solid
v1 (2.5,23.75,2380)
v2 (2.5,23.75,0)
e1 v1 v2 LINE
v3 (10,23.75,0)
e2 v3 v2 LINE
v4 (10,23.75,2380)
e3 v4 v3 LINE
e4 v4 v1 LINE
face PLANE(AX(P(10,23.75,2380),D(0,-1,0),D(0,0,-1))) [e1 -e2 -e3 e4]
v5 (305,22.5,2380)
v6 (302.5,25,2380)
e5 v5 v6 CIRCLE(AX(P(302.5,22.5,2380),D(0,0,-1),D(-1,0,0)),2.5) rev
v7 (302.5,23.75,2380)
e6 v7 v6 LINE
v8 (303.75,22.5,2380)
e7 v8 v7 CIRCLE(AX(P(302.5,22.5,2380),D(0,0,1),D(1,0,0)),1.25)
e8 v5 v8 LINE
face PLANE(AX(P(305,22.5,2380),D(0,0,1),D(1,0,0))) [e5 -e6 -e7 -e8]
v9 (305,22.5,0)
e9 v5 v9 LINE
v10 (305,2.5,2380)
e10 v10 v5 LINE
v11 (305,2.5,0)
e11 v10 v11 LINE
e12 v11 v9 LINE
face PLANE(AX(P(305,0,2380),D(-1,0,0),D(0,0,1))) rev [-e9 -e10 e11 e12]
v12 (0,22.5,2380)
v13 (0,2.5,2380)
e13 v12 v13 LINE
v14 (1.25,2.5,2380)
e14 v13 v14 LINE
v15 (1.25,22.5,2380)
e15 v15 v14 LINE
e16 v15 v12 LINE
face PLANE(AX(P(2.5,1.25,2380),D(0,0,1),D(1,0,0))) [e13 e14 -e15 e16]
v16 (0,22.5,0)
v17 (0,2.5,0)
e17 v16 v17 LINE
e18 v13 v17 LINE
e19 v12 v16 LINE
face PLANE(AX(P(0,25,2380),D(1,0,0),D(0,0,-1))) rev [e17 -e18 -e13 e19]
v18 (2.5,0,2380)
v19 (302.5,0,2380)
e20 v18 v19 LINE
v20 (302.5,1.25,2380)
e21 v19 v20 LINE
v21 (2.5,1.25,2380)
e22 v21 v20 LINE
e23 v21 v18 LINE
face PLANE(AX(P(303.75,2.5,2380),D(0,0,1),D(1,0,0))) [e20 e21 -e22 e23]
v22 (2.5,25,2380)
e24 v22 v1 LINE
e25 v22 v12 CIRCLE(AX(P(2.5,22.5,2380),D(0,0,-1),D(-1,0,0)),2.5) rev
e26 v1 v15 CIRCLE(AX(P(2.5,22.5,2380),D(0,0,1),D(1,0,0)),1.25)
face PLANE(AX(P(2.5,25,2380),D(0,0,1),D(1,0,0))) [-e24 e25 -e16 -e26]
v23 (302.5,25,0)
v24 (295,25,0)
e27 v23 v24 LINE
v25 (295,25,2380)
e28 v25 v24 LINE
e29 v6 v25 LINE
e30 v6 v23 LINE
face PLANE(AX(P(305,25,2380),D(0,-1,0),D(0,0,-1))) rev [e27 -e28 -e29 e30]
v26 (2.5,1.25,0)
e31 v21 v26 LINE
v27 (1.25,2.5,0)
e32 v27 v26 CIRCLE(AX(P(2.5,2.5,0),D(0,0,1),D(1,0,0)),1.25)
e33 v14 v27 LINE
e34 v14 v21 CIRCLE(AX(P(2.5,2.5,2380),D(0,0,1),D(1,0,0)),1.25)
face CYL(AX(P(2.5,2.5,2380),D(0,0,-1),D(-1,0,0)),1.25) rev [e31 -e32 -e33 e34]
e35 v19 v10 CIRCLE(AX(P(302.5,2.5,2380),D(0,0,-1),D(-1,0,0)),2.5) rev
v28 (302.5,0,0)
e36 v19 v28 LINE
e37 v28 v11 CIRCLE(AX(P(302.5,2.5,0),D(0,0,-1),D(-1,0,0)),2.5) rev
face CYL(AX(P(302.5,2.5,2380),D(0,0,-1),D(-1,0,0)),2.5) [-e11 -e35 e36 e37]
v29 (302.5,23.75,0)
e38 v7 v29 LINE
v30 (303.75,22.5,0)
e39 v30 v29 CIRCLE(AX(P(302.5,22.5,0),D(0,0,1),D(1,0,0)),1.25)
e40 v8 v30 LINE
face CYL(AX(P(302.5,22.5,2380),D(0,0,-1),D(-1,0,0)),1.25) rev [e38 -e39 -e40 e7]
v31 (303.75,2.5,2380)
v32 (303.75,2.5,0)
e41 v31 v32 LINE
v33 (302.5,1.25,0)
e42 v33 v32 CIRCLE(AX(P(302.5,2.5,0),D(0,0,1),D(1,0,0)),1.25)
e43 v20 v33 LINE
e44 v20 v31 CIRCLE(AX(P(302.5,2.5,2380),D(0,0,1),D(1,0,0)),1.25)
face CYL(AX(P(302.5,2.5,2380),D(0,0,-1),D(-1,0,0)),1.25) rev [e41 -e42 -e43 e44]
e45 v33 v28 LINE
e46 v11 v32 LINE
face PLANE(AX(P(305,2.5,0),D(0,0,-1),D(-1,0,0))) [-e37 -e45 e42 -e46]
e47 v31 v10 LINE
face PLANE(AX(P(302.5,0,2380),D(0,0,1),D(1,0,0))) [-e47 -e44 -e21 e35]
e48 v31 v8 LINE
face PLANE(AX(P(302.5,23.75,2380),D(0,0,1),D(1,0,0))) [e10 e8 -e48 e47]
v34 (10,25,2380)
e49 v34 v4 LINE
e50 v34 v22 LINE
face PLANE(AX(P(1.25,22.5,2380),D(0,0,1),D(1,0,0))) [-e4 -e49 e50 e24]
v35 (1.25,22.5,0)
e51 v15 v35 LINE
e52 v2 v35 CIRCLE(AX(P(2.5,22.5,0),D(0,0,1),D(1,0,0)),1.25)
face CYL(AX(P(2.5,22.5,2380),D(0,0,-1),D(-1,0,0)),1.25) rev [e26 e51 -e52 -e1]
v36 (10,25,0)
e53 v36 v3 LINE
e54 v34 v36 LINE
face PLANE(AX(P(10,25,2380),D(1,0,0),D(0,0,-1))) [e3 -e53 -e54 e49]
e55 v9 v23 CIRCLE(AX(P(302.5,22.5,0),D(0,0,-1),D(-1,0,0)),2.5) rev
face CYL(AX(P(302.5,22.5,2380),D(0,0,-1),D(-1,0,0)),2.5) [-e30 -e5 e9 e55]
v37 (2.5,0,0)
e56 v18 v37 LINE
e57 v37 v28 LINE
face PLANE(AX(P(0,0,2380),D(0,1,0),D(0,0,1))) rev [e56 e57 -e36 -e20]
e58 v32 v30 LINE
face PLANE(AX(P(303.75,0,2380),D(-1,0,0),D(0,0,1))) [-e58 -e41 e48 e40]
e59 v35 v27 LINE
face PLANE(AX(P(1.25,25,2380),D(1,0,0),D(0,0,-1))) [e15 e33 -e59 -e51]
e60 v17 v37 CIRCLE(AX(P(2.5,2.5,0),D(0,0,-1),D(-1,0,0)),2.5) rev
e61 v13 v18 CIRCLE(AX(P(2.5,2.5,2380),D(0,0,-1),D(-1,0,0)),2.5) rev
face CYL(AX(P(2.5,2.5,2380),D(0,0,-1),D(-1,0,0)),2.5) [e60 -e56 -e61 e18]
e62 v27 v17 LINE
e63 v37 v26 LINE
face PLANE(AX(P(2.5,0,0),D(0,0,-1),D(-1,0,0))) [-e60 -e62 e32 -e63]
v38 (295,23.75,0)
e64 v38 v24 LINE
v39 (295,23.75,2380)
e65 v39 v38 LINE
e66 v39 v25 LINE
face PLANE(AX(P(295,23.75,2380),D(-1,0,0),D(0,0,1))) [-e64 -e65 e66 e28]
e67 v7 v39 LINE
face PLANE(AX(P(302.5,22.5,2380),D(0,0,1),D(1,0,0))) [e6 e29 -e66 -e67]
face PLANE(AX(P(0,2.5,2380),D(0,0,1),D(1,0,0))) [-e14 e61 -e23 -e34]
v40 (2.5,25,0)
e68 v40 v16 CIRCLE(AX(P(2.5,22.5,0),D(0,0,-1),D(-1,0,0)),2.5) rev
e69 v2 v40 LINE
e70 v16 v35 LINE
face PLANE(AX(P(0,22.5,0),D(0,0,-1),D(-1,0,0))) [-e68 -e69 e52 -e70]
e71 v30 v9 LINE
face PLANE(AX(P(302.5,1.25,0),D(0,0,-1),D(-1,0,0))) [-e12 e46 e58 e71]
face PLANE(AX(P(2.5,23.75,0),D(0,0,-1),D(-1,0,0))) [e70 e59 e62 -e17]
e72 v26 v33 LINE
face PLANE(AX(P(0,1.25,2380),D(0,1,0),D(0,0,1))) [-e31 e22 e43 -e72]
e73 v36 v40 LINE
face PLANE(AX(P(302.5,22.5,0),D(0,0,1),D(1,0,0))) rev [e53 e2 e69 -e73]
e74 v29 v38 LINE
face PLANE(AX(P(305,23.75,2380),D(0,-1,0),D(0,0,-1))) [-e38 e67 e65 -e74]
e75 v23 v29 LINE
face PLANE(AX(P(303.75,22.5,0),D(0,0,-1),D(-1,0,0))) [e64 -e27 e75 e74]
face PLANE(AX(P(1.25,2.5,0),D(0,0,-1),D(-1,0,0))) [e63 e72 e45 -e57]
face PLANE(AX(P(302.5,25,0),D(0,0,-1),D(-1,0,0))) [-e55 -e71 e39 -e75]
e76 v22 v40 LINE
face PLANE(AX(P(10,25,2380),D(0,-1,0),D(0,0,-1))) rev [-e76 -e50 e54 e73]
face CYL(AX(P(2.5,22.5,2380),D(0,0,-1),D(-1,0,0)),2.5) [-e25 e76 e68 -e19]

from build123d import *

# Parameters (mm, degrees)
BASE_FLANGE1_DEPTH = 2380


# Sheet-metal steps are written as plain solids
with BuildPart() as part:
    # Sketch1 → Base-Flange1 (new body)
    with BuildSketch(Plane.XY):
        with BuildLine():
            Line((10, 25), (2.5, 25))
            ThreePointArc((2.5, 25), (0.732233047, 24.267766953), (0, 22.5))
            Line((0, 22.5), (0, 2.5))
            ThreePointArc((0, 2.5), (0.732233047, 0.732233047), (2.5, 0))
            Line((2.5, 0), (302.5, 0))
            ThreePointArc((302.5, 0), (304.267766953, 0.732233047), (305, 2.5))
            Line((305, 2.5), (305, 22.5))
            ThreePointArc((305, 22.5), (304.267766953, 24.267766953), (302.5, 25))
            Line((302.5, 25), (295, 25))
            Line((295, 25), (295, 23.75))
            Line((295, 23.75), (302.5, 23.75))
            ThreePointArc((302.5, 23.75), (303.383883476, 23.383883476), (303.75, 22.5))
            Line((303.75, 22.5), (303.75, 2.5))
            ThreePointArc((303.75, 2.5), (303.383883476, 1.616116524), (302.5, 1.25))
            Line((302.5, 1.25), (2.5, 1.25))
            ThreePointArc((2.5, 1.25), (1.616116524, 1.616116524), (1.25, 2.5))
            Line((1.25, 2.5), (1.25, 22.5))
            ThreePointArc((1.25, 22.5), (1.616116524, 23.383883476), (2.5, 23.75))
            Line((2.5, 23.75), (10, 23.75))
            Line((10, 23.75), (10, 25))
        make_face()
    extrude(amount=BASE_FLANGE1_DEPTH)


solid = part.part
